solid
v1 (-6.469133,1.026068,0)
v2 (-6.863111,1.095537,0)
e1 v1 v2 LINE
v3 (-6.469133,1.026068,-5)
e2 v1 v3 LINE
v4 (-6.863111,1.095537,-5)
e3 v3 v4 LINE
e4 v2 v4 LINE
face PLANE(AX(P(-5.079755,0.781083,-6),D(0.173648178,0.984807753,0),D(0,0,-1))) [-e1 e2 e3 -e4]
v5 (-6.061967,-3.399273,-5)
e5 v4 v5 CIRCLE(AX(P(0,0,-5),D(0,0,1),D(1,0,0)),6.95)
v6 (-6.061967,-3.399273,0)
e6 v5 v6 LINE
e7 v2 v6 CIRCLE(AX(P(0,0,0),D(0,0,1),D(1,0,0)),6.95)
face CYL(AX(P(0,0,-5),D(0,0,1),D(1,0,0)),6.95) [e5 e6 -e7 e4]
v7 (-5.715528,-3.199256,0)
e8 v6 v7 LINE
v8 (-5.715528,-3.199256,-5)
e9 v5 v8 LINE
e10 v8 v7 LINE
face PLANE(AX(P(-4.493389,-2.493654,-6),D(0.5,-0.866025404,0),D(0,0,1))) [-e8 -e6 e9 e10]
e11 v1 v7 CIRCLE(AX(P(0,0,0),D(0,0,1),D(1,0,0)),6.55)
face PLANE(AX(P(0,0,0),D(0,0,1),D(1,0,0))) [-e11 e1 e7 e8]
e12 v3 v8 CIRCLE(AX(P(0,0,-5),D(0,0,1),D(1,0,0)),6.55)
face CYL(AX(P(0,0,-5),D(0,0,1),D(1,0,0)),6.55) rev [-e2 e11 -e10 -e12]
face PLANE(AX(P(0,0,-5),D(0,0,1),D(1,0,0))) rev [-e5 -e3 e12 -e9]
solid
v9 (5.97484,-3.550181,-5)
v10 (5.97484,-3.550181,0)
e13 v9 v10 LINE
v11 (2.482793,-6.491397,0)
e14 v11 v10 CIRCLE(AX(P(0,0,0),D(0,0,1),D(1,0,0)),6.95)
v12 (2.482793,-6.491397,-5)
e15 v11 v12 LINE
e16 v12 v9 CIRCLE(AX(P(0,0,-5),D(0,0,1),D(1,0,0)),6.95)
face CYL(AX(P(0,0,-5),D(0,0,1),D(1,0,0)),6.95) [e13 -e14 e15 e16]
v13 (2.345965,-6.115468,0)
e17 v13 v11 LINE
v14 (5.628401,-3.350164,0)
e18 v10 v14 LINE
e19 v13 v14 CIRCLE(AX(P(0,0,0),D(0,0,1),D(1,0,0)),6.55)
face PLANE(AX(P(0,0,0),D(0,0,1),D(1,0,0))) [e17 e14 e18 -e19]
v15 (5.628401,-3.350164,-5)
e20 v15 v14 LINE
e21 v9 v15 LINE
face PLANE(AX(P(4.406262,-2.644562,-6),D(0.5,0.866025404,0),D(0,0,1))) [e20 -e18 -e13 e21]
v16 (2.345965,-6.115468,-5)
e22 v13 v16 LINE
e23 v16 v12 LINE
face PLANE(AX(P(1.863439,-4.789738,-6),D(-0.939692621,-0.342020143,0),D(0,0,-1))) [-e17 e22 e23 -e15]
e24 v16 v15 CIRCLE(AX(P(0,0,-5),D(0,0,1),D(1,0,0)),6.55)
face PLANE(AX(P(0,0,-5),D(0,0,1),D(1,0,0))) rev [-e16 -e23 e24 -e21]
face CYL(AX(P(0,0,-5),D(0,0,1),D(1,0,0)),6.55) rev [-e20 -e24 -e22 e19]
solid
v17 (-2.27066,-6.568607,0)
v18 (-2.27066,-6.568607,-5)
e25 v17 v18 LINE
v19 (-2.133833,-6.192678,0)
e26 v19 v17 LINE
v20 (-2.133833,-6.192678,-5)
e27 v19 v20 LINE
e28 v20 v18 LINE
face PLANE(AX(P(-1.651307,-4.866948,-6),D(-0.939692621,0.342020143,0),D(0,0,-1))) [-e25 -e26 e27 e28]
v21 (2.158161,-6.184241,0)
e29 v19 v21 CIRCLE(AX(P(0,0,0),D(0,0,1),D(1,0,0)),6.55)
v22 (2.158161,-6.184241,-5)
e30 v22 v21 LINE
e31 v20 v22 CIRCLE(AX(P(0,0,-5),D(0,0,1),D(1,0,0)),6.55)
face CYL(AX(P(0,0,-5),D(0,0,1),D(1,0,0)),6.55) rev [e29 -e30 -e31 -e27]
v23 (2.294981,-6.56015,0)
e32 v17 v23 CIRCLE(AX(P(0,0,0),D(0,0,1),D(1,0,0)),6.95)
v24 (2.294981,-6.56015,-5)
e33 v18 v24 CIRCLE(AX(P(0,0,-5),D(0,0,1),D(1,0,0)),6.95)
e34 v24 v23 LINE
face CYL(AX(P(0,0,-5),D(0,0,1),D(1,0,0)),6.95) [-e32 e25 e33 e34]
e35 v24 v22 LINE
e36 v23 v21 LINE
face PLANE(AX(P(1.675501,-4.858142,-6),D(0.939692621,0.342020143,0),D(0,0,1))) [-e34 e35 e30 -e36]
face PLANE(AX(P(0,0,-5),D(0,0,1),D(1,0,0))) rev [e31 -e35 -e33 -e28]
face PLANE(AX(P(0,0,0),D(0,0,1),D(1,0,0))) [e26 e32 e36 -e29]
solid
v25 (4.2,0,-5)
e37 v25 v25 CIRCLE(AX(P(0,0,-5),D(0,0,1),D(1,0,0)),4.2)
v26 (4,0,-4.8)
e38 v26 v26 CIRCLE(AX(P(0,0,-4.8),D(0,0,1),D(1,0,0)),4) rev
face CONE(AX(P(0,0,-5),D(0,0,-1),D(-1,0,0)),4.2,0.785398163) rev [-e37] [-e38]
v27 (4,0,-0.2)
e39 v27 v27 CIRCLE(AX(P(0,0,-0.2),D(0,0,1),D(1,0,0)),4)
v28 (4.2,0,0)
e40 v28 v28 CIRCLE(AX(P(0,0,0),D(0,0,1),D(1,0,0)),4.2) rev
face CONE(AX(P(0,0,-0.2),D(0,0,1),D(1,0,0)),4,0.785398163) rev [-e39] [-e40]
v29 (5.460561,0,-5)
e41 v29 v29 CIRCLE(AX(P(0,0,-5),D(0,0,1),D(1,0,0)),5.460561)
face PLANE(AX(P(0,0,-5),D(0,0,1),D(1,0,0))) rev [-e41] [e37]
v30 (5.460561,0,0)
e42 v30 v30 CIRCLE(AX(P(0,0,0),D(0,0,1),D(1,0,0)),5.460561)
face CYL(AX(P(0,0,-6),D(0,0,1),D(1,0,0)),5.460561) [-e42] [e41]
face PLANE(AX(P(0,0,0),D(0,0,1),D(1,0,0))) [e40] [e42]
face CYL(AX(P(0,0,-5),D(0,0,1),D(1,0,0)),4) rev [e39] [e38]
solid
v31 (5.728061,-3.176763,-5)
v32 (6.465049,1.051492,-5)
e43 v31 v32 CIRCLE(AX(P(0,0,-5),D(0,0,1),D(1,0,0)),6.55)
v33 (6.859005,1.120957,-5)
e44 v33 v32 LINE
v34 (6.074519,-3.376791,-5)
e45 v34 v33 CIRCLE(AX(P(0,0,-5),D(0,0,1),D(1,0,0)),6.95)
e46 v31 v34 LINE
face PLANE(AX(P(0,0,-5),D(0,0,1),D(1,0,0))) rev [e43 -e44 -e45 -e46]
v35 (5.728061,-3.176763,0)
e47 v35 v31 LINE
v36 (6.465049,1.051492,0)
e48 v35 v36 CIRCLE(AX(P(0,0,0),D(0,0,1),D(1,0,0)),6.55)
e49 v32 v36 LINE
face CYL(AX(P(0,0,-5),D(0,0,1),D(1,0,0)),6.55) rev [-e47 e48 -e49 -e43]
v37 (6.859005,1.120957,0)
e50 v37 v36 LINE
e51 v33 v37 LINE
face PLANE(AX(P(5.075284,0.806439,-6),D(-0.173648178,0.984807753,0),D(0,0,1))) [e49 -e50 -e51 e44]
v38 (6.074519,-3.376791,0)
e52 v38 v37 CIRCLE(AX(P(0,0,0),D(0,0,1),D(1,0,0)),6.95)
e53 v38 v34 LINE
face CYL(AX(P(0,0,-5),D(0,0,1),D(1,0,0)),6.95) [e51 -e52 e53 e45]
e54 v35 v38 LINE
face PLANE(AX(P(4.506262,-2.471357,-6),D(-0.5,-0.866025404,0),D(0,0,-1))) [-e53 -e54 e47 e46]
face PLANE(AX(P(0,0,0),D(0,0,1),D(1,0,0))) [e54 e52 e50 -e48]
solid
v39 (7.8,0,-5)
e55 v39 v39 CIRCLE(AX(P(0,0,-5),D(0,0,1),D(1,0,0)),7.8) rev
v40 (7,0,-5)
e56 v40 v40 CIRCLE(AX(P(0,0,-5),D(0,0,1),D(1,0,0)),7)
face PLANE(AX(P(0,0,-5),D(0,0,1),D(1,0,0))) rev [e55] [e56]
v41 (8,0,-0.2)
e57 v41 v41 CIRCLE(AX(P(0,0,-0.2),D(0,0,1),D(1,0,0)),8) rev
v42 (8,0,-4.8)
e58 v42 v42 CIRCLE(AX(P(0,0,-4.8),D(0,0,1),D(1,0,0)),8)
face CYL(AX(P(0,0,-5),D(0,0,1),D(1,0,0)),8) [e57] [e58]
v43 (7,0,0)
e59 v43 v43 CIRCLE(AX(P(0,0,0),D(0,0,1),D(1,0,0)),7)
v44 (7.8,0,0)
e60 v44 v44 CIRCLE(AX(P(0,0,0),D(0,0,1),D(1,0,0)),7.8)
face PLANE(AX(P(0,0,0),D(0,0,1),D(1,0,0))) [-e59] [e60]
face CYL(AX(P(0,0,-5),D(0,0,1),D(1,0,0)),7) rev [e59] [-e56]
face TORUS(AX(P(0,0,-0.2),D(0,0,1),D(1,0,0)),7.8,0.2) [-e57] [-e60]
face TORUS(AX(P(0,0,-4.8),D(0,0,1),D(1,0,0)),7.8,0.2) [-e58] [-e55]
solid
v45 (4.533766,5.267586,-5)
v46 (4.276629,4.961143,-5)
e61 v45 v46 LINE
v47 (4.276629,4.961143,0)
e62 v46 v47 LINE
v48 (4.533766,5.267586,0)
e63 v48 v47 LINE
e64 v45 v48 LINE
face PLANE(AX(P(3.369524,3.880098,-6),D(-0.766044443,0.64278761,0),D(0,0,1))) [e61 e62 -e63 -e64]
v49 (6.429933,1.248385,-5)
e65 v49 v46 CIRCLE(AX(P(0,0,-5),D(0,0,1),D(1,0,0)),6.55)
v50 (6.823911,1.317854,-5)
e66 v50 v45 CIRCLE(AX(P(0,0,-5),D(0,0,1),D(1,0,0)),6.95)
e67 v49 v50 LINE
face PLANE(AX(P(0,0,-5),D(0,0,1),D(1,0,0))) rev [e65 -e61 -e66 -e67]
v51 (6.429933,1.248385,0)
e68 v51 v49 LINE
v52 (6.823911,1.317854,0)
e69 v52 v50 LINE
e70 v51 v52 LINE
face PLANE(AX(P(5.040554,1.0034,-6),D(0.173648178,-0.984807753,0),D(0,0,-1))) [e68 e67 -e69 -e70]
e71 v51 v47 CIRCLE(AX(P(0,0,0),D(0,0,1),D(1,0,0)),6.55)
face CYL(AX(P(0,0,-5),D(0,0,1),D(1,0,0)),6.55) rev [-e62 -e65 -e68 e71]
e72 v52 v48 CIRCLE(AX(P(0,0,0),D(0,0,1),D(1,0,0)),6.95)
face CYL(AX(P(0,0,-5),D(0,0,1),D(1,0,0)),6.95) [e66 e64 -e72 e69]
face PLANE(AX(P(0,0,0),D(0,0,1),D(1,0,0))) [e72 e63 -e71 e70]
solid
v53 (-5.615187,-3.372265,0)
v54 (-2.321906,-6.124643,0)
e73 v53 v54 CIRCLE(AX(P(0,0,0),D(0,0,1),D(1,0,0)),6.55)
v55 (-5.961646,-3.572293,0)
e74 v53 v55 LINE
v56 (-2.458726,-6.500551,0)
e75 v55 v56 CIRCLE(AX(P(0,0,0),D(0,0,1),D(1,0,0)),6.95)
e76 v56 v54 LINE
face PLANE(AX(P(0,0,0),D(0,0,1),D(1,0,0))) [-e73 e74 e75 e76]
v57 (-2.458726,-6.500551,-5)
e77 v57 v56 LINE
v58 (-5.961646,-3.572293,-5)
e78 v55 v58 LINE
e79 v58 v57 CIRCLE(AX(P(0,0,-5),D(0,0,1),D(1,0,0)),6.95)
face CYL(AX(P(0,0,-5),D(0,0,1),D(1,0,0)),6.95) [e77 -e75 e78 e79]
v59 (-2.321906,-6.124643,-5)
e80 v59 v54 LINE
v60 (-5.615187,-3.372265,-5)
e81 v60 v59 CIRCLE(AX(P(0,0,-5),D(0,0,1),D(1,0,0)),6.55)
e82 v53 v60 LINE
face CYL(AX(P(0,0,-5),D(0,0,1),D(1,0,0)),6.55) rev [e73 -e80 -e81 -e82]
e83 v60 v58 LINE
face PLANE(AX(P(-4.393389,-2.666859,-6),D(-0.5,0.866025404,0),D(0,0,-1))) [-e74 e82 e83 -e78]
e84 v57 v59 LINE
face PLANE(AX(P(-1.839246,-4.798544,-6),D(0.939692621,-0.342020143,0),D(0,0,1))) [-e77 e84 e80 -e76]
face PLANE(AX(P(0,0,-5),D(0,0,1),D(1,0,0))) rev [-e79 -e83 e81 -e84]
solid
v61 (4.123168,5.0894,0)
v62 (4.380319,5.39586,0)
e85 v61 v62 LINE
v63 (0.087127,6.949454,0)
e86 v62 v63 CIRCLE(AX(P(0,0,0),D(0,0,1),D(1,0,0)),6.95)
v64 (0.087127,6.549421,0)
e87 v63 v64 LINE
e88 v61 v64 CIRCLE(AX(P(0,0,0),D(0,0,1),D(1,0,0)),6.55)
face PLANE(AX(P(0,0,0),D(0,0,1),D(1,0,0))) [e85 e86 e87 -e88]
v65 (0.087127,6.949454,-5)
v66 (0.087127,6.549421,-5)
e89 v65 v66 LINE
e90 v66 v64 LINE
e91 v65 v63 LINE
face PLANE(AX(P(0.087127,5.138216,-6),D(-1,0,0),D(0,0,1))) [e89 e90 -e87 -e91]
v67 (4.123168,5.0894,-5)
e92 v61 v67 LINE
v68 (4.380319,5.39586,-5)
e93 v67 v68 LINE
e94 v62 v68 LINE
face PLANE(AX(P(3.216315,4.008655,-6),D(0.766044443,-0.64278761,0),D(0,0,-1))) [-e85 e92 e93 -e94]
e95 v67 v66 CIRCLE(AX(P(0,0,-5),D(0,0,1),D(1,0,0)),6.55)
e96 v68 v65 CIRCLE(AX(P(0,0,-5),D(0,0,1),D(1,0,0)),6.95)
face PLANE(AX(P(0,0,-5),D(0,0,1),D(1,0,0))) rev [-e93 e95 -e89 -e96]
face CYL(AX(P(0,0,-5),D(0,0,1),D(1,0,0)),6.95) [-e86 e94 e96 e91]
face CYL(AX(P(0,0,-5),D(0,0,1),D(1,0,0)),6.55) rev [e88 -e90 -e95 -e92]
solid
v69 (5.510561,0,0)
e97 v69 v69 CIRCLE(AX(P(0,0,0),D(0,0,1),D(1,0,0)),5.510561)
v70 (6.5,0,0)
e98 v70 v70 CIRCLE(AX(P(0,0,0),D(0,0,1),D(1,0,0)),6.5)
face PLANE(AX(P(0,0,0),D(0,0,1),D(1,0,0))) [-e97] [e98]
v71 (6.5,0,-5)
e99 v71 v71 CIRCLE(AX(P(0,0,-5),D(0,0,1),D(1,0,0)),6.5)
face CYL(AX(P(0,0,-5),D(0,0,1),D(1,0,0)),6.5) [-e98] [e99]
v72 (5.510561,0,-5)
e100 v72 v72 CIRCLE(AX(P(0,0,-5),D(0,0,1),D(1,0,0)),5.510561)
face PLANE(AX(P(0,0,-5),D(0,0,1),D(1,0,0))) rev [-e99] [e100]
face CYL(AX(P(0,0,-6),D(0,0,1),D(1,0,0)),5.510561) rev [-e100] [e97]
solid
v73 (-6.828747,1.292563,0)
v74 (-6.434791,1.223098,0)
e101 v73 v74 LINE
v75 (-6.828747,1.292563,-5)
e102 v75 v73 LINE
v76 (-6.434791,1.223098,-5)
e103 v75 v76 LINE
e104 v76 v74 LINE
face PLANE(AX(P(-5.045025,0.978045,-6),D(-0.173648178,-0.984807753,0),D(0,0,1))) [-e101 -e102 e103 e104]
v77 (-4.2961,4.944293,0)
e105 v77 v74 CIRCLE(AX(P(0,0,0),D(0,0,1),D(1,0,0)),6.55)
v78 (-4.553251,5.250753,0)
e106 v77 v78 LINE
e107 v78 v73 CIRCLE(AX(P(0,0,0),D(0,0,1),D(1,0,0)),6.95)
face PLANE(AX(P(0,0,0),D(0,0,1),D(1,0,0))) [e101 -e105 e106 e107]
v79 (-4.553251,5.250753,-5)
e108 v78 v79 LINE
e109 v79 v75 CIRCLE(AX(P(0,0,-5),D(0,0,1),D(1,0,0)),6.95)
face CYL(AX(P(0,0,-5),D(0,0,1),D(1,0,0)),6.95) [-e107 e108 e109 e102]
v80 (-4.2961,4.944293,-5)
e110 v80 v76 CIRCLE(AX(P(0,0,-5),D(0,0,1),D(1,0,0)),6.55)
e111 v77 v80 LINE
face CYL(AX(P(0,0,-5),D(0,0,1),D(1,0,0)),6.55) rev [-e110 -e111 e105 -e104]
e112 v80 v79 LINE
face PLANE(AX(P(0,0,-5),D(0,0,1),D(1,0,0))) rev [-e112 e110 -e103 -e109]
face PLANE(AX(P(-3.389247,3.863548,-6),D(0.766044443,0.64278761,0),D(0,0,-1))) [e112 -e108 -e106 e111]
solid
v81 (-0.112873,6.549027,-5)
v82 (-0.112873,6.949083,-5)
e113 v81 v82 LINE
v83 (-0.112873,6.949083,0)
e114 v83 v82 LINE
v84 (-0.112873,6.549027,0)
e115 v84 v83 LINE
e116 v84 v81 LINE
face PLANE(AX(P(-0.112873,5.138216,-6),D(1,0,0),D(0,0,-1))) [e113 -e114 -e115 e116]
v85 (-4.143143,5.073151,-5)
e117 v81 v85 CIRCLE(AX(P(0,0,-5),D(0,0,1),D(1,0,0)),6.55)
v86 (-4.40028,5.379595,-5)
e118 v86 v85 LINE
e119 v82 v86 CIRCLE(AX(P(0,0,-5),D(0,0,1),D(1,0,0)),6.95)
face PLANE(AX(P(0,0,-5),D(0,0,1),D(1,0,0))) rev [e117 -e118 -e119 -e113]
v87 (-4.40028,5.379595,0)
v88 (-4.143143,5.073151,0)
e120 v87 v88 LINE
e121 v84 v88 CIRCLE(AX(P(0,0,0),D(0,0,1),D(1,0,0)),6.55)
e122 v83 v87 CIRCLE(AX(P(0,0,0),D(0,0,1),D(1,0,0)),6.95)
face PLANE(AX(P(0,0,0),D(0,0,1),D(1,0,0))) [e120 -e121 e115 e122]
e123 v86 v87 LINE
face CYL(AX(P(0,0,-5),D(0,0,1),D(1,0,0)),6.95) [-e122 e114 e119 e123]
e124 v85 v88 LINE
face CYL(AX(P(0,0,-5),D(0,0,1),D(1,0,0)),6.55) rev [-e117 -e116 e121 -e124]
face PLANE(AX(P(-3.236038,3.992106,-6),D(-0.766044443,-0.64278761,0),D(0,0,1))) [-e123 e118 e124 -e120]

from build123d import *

# Parameters (mm, degrees)
SKETCH1_R                = 8
BOSS_EXTRUDE1_DEPTH      = 5
SKETCH1_3_R              = 4
CUT_EXTRUDE1_DEPTH       = 5
SKETCH1_4_R              = 7
CUT_EXTRUDE2_DEPTH       = 5
SKETCH1_5_R              = 6.5
BOSS_EXTRUDE2_DEPTH      = 5
SKETCH1_6_R              = 4
CUT_EXTRUDE3_DEPTH       = 5
SKETCH3_R                = 7
SKETCH3_R_2              = 6.5
BOSS_EXTRUDE3_DEPTH      = 5
MOVE_START               = -5
MOVE_FACE1_OUTLINE_R     = 7
MOVE_FACE1_OUTLINE_R_2   = 6.95
MOVE_FACE1_OUTLINE_R_3   = 6.55
MOVE_FACE1_OUTLINE_R_4   = 6.5
MOVE_FACE1_DEPTH         = 5
BOSS_EXTRUDE4_DEPTH      = 1
BOSS_EXTRUDE4_DEPTH_BACK = 6
SKETCH4_W                = 0.2
SKETCH4_H                = 2.390737137
CIRPATTERN1_COUNT        = 9
SKETCH5_R                = 5.51056118
SKETCH5_R_2              = 5.46056118
CUT_EXTRUDE4_DEPTH       = 6
FILLET1_R                = 0.2
CHAMFER1_SIZE            = 0.2


# Read off the part's stored shape, not the designer's step: Move Face1
with BuildPart() as part:
    # Sketch1 → Boss-Extrude1 (new body)
    with BuildSketch(Plane.XY):
        Circle(SKETCH1_R)
    extrude(amount=-BOSS_EXTRUDE1_DEPTH)

    # Sketch1<3> → Cut-Extrude1 (cut)
    with BuildSketch(Plane.XY):
        Circle(SKETCH1_3_R)
    extrude(amount=-CUT_EXTRUDE1_DEPTH, mode=Mode.SUBTRACT)

    # Sketch1<4> → Cut-Extrude2 (cut)
    with BuildSketch(Plane.XY):
        Circle(SKETCH1_4_R)
    extrude(amount=-CUT_EXTRUDE2_DEPTH, mode=Mode.SUBTRACT)

    # Fillet1
    fillet1_edges = [part.edges().sort_by_distance(p)[0] for p in [
        (-8, 0, 0),
        (-8, 0, -5),
    ]]
    fillet(fillet1_edges, radius=FILLET1_R)


with BuildPart() as body_2:
    # Sketch1<5> → Boss-Extrude2 (new body)
    with BuildSketch(Plane.XY):
        Circle(SKETCH1_5_R)
    extrude(amount=-BOSS_EXTRUDE2_DEPTH)

    # Sketch1<6> → Cut-Extrude3 (cut)
    with BuildSketch(Plane.XY):
        Circle(SKETCH1_6_R)
    extrude(amount=-CUT_EXTRUDE3_DEPTH, mode=Mode.SUBTRACT)

    # Sketch5 → Cut-Extrude4 (cut)
    with BuildSketch(Plane.XY):
        Circle(SKETCH5_R)
        Circle(SKETCH5_R_2, mode=Mode.SUBTRACT)
    extrude(amount=-CUT_EXTRUDE4_DEPTH, mode=Mode.SUBTRACT)


with BuildPart() as body_3:
    # Sketch3 → Boss-Extrude3 (new body)
    with BuildSketch(Plane.XY):
        Circle(SKETCH3_R)
        Circle(SKETCH3_R_2, mode=Mode.SUBTRACT)
    extrude(amount=-BOSS_EXTRUDE3_DEPTH)

    # Move Face1 outline → Move Face1 (cut)
    # profile 1 of 2: a face of its own
    with BuildSketch(Plane.XY.offset(MOVE_START)):
        Circle(MOVE_FACE1_OUTLINE_R)
        Circle(MOVE_FACE1_OUTLINE_R_2, mode=Mode.SUBTRACT)
    # profile 2 of 2: a face of its own
    with BuildSketch(Plane.XY.offset(MOVE_START)):
        Circle(MOVE_FACE1_OUTLINE_R_3)
        Circle(MOVE_FACE1_OUTLINE_R_4, mode=Mode.SUBTRACT)
    extrude(amount=MOVE_FACE1_DEPTH, mode=Mode.SUBTRACT)


with BuildPart() as body_4:
    # Sketch4 → Boss-Extrude4 (new, two sides: drawn at the far end of the back side and taken through both)
    with BuildSketch(Plane(origin=(0, 0, -5), x_dir=(-1, 0, 0), z_dir=(0, 0, -1)).offset(-BOSS_EXTRUDE4_DEPTH_BACK)):
        with Locations((0.01287322, 6.333584267)):
            Rectangle(SKETCH4_W, SKETCH4_H)
    extrude(amount=BOSS_EXTRUDE4_DEPTH + BOSS_EXTRUDE4_DEPTH_BACK)


with BuildPart() as cirpattern1_1:
    # CirPattern1: pattern copy
    add(body_4.part.rotate(Axis((0, 0, 0), (0, 0, 1)), 1 * 360 / CIRPATTERN1_COUNT))


with BuildPart() as cirpattern1_2:
    # CirPattern1: pattern copy
    add(body_4.part.rotate(Axis((0, 0, 0), (0, 0, 1)), 2 * 360 / CIRPATTERN1_COUNT))


with BuildPart() as cirpattern1_3:
    # CirPattern1: pattern copy
    add(body_4.part.rotate(Axis((0, 0, 0), (0, 0, 1)), 3 * 360 / CIRPATTERN1_COUNT))


with BuildPart() as cirpattern1_4:
    # CirPattern1: pattern copy
    add(body_4.part.rotate(Axis((0, 0, 0), (0, 0, 1)), 4 * 360 / CIRPATTERN1_COUNT))


with BuildPart() as cirpattern1_5:
    # CirPattern1: pattern copy
    add(body_4.part.rotate(Axis((0, 0, 0), (0, 0, 1)), 5 * 360 / CIRPATTERN1_COUNT))


with BuildPart() as cirpattern1_6:
    # CirPattern1: pattern copy
    add(body_4.part.rotate(Axis((0, 0, 0), (0, 0, 1)), 6 * 360 / CIRPATTERN1_COUNT))


with BuildPart() as cirpattern1_7:
    # CirPattern1: pattern copy
    add(body_4.part.rotate(Axis((0, 0, 0), (0, 0, 1)), 7 * 360 / CIRPATTERN1_COUNT))


with BuildPart() as cirpattern1_8:
    # CirPattern1: pattern copy
    add(body_4.part.rotate(Axis((0, 0, 0), (0, 0, 1)), 8 * 360 / CIRPATTERN1_COUNT))


with BuildPart() as body_3_1:
    add(body_3.part)

    # Combine1: cut body 4, CirPattern1_1, CirPattern1_2, CirPattern1_3, CirPattern1_4, CirPattern1_5, CirPattern1_6, CirPattern1_7, CirPattern1_8
    add(body_4.part, mode=Mode.SUBTRACT)
    add(cirpattern1_1.part, mode=Mode.SUBTRACT)
    add(cirpattern1_2.part, mode=Mode.SUBTRACT)
    add(cirpattern1_3.part, mode=Mode.SUBTRACT)
    add(cirpattern1_4.part, mode=Mode.SUBTRACT)
    add(cirpattern1_5.part, mode=Mode.SUBTRACT)
    add(cirpattern1_6.part, mode=Mode.SUBTRACT)
    add(cirpattern1_7.part, mode=Mode.SUBTRACT)
    add(cirpattern1_8.part, mode=Mode.SUBTRACT)


with BuildPart() as cut_extrude4_piece_1:
    # of the separate pieces the step leaves, piece 1, a body of its own (cut_extrude4_pieces)
    add(body_2.part.solids().sort_by_distance((5.46056118, 0, 0))[0])

    # Chamfer1
    chamfer1_edges = [cut_extrude4_piece_1.edges().sort_by_distance(p)[0] for p in [
        (-4, 0, -5),
        (-4, 0, 0),
    ]]
    chamfer(chamfer1_edges, length=CHAMFER1_SIZE)


with BuildPart() as cut_extrude4_piece_2:
    # of the separate pieces the step leaves, piece 2, a body of its own (cut_extrude4_pieces)
    add(body_2.part.solids().sort_by_distance((6.5, 0, 0))[0])


solid = Compound([part.part, body_3_1.part, cut_extrude4_piece_1.part, cut_extrude4_piece_2.part])
